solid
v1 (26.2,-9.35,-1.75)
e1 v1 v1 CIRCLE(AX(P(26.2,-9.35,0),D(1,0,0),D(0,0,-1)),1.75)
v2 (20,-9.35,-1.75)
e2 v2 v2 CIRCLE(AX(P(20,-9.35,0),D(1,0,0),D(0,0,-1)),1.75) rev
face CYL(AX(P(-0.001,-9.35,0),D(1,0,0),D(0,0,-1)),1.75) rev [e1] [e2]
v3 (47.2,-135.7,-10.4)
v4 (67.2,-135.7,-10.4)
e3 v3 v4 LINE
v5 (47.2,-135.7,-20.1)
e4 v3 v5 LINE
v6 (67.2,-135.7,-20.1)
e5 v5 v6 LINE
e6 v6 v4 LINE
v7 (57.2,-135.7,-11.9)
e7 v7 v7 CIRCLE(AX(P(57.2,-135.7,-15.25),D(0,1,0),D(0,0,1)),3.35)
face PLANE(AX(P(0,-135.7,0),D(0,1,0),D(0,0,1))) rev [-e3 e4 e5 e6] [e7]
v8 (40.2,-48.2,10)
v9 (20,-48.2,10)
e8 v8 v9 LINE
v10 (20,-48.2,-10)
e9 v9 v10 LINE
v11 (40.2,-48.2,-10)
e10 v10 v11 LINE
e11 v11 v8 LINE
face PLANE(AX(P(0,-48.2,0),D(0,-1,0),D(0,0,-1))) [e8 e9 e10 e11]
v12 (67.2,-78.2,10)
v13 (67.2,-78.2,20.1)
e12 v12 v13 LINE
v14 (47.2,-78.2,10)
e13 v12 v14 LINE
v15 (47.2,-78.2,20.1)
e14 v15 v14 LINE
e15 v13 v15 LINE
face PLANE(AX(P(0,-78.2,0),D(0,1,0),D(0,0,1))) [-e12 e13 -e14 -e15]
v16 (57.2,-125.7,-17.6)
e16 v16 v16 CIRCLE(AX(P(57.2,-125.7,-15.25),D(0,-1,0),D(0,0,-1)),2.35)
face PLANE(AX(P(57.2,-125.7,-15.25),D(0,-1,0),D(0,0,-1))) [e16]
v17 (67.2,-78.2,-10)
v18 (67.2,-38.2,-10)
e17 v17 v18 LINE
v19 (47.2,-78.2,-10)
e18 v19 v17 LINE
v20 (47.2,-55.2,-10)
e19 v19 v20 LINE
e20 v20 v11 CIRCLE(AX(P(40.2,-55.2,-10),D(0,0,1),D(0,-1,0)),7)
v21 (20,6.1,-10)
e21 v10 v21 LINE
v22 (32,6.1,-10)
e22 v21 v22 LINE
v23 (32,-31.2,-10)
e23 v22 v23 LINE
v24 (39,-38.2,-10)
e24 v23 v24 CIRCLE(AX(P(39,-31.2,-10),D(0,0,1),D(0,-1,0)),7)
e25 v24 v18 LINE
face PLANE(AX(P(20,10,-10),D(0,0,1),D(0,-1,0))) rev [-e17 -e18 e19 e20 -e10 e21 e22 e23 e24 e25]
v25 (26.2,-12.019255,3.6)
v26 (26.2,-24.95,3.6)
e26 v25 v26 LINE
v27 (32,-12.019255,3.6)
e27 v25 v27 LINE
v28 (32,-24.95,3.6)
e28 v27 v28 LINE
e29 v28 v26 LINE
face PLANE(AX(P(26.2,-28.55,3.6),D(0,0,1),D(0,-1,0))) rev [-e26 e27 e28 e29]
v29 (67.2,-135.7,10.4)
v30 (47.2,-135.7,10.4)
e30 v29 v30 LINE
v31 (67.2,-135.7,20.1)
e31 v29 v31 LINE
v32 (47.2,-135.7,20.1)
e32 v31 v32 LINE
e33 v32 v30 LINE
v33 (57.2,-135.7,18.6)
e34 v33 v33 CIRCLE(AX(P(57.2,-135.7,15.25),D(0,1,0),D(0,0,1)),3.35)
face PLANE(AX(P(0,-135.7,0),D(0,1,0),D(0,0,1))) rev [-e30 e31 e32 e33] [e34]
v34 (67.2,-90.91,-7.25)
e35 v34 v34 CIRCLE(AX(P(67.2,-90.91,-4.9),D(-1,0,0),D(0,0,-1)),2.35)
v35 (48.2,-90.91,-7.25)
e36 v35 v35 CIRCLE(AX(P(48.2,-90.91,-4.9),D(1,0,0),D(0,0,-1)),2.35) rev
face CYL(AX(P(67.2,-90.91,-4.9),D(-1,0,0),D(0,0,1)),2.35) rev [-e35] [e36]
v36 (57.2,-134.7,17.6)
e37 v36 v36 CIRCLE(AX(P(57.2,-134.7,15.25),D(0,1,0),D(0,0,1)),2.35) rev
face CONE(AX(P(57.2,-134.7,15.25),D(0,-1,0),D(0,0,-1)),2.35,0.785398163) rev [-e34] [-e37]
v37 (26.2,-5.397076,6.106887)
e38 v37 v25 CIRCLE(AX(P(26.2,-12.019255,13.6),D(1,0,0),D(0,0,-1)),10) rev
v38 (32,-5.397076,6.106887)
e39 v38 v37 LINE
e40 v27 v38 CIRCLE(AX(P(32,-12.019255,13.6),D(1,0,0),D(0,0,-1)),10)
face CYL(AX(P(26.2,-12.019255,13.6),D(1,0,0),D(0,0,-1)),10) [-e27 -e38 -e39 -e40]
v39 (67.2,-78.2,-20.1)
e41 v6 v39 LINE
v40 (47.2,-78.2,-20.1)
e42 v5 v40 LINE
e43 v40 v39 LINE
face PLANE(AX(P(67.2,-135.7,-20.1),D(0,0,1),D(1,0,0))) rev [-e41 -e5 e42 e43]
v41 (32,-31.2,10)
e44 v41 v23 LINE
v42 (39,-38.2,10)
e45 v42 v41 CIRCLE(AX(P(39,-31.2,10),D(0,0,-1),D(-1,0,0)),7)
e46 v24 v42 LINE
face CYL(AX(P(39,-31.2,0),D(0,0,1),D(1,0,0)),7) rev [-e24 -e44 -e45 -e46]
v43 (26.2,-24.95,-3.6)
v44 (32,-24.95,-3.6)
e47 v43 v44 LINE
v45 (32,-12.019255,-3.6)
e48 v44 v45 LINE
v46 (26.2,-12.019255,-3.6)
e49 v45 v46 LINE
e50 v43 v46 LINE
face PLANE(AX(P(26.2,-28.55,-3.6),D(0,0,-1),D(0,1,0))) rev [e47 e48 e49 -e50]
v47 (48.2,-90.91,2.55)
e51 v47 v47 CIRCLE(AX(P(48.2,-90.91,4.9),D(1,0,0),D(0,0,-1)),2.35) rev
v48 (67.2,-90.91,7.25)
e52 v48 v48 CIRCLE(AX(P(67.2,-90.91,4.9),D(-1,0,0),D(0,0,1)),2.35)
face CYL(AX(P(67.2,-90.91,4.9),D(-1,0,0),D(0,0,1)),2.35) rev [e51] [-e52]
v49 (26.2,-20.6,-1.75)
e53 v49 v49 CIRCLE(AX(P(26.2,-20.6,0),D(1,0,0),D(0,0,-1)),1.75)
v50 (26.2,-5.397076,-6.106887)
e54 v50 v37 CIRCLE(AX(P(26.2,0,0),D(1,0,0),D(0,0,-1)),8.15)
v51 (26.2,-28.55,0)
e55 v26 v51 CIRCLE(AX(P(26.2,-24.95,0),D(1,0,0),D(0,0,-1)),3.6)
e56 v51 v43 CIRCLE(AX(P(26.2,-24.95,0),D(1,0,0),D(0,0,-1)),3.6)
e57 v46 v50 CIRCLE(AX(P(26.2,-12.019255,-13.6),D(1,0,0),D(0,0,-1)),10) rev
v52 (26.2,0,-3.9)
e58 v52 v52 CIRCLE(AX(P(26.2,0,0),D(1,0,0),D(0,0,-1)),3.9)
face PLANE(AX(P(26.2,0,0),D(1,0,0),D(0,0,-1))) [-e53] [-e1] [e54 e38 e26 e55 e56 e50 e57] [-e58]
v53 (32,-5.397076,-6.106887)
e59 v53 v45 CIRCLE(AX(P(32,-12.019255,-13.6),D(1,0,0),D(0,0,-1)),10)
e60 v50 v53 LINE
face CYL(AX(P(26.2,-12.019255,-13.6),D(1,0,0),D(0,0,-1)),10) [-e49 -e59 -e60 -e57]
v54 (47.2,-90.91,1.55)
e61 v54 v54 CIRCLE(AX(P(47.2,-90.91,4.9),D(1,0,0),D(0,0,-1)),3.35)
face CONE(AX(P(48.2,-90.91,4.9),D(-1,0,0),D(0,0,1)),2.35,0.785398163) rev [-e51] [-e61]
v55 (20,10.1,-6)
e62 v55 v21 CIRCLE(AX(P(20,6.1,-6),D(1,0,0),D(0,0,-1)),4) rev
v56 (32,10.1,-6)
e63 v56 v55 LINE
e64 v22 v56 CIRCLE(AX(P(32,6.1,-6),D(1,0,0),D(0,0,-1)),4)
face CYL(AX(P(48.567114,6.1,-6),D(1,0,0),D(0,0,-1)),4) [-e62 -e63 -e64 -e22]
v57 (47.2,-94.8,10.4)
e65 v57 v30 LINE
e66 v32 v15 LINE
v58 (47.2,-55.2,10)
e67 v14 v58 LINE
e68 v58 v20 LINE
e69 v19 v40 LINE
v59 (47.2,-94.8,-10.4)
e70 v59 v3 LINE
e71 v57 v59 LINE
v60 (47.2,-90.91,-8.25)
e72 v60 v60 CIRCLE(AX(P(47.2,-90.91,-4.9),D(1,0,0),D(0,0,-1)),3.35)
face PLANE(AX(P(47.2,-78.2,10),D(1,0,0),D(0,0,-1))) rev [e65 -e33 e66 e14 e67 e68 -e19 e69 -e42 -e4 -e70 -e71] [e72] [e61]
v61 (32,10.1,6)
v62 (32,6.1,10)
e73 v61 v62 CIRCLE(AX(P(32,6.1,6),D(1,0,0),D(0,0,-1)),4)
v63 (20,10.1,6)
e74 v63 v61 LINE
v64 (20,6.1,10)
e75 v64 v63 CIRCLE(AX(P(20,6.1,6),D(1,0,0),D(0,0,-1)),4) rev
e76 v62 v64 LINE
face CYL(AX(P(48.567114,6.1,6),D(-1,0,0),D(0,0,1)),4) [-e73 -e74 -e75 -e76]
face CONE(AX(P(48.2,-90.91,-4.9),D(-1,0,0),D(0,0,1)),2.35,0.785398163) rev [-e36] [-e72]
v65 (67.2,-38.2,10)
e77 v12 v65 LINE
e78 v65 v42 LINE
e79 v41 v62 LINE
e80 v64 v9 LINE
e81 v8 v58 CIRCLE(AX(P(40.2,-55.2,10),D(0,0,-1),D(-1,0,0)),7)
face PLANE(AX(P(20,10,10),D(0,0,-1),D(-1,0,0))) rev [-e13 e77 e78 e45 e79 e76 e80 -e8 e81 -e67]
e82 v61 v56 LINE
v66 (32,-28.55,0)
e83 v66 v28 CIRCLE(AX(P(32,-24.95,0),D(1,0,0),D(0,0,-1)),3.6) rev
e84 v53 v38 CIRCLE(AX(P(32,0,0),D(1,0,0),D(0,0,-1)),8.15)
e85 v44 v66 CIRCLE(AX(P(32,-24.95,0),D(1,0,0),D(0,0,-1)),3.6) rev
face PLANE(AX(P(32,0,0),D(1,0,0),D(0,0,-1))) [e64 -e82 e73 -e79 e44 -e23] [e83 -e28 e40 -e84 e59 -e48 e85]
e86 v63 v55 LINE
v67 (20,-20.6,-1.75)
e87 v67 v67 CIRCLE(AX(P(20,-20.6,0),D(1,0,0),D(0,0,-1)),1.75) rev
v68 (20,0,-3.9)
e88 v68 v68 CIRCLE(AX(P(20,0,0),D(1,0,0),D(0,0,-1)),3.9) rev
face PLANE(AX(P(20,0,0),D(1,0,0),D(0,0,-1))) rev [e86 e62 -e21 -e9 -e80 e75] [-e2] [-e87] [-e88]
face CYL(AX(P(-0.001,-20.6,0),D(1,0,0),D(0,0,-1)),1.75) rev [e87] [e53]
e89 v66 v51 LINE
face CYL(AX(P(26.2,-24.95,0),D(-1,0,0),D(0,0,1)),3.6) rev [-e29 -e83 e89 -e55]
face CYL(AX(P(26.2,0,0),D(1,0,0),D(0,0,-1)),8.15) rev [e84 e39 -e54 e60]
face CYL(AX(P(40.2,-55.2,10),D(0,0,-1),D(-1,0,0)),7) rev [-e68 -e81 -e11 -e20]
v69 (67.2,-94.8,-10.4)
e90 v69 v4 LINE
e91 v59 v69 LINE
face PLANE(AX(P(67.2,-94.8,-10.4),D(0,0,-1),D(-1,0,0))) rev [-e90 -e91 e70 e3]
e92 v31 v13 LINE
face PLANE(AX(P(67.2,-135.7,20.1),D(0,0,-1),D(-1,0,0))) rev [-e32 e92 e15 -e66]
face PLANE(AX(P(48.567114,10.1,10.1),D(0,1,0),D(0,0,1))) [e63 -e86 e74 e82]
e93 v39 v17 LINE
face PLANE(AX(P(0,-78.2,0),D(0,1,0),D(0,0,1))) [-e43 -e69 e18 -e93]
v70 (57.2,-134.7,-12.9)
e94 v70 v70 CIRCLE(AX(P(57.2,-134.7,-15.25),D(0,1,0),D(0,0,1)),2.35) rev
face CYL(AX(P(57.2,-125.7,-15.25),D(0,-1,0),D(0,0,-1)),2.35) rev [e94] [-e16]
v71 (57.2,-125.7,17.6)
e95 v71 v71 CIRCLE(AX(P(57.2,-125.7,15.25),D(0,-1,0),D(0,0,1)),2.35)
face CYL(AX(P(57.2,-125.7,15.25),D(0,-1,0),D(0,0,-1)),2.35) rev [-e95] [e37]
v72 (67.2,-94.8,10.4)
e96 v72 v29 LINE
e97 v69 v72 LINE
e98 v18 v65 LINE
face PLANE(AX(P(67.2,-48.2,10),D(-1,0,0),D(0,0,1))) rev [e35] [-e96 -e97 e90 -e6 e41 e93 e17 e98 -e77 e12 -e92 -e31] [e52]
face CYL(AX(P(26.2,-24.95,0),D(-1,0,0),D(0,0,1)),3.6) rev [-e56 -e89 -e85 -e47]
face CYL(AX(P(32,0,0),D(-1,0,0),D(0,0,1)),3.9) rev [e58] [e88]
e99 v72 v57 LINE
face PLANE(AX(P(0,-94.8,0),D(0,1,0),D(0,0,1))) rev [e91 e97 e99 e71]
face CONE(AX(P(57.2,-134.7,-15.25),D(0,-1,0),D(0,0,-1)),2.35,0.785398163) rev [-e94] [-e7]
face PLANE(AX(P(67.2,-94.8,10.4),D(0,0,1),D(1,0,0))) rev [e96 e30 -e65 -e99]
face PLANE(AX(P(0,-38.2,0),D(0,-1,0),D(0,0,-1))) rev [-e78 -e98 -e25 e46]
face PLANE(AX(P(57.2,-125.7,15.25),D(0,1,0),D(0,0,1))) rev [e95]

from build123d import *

# Parameters (mm, degrees)
SKETCH1_W            = 20
SKETCH1_H            = 20
BOSS_EXTRUDE1_DEPTH  = 20
SKETCH2_W            = 45
SKETCH2_H            = 70
BOSS_EXTRUDE2_DEPTH  = 12
CUT_EXTRUDE1_DEPTH   = 5.8
FILLET1_R            = 3.6
FILLET2_R            = 10
SKETCH5_R            = 3.9
CUT_EXTRUDE2_DEPTH   = 53.490475326
CUT_EXTRUDE3_REACH   = 51.17
SKETCH6_R            = 1.75
SKETCH7_W            = 12
SKETCH7_H            = 45
CUT_EXTRUDE4_DEPTH   = 4.8
SKETCH9_W            = 12
SKETCH9_H            = 45
CUT_EXTRUDE5_DEPTH   = 23.8
SKETCH10_W           = 12.5
SKETCH10_H           = 41.4
CUT_EXTRUDE6_DEPTH   = 23.8
SKETCH11_W           = 20
SKETCH11_H           = 1.2
CUT_EXTRUDE7_DEPTH   = 23.8
BOSS_EXTRUDE3_START  = 20
SKETCH12_W           = 20
SKETCH12_H           = 20
SKETCH12_R           = 3.9
BOSS_EXTRUDE3_DEPTH  = 20
SKETCH13_W           = 20.2
SKETCH13_H           = 20.2
SKETCH13_R           = 3.9
BOSS_EXTRUDE4_DEPTH  = 40
SKETCH14_W           = 12
SKETCH14_H           = 20
BOSS_EXTRUDE5_DEPTH  = 0.1
SKETCH17_R           = 4.83091966
BOSS_EXTRUDE8_DEPTH  = 39
SKETCH18_W           = 20.2
SKETCH18_H           = 20.2
CUT_EXTRUDE8_DEPTH   = 40
FILLET4_R            = 4
SKETCH20_W           = 12
SKETCH20_H           = 20
BOSS_EXTRUDE9_DEPTH  = 8
SKETCH21_W           = 47.2
SKETCH21_H           = 20
BOSS_EXTRUDE11_DEPTH = 10
SKETCH23_W           = 20
SKETCH23_H           = 20
BOSS_EXTRUDE12_DEPTH = 30
SKETCH25_W           = 20
SKETCH25_H           = 40.2
BOSS_EXTRUDE13_DEPTH = 57.5
SKETCH26_W           = 20
SKETCH26_H           = 20.8
CUT_EXTRUDE9_DEPTH   = 40.9
SKETCH27_R           = 2.35
CUT_EXTRUDE10_DEPTH  = 10
SKETCH28_R           = 2.35
CUT_EXTRUDE11_DEPTH  = 140.85113514
CHAMFER1_SIZE        = 1
FILLET5_R            = 7


with BuildPart() as part:
    # Sketch1 → Boss-Extrude1 (new body)
    with BuildSketch(Plane(origin=(0, 0, 0), x_dir=(0, 0, -1), z_dir=(1, 0, 0))):
        Rectangle(SKETCH1_W, SKETCH1_H)
    extrude(amount=BOSS_EXTRUDE1_DEPTH)

    # Sketch2 → Boss-Extrude2 (add)
    with BuildSketch(Plane(origin=(20, 0, 0), x_dir=(0, 0, -1), z_dir=(1, 0, 0))):
        Rectangle(SKETCH2_W, SKETCH2_H)
    extrude(amount=BOSS_EXTRUDE2_DEPTH)

    # Sketch4 → Cut-Extrude1 (cut)
    with BuildSketch(Plane(origin=(32, 0, 0), x_dir=(0, 0, -1), z_dir=(1, 0, 0))):
        with BuildLine():
            Line((3.6, -28.55), (-3.6, -28.55))
            Line((-3.6, -28.55), (-3.6, -7.311805523))
            ThreePointArc((-3.6, -7.311805523), (0, 8.15), (3.6, -7.311805523))
            Line((3.6, -7.311805523), (3.6, -28.55))
        make_face()
    extrude(amount=-CUT_EXTRUDE1_DEPTH, mode=Mode.SUBTRACT)

    # Fillet1
    fillet1_edges = [part.edges().sort_by_distance(p)[0] for p in [
        (29.1, -28.55, 3.6),
        (29.1, -28.55, -3.6),
    ]]
    fillet(fillet1_edges, radius=FILLET1_R - 0.0001)  # a hair under: the kernel refuses the full size

    # Fillet2
    fillet2_edges = [part.edges().sort_by_distance(p)[0] for p in [
        (29.1, -7.311805523, 3.6),
        (29.1, -7.311805523, -3.6),
    ]]
    fillet(fillet2_edges, radius=FILLET2_R)

    # Sketch5 → Cut-Extrude2 (cut, through all)
    with BuildSketch(Plane.ZY):
        Circle(SKETCH5_R)
    extrude(amount=-CUT_EXTRUDE2_DEPTH, mode=Mode.SUBTRACT)

    # Sketch6 → Cut-Extrude3 (cut, up to next)
    with BuildSketch(Plane(origin=(26.2, 0, 0), x_dir=(0, 0, -1), z_dir=(1, 0, 0)), mode=Mode.PRIVATE) as cut_extrude3_sk1:
        with Locations((0, -20.6)):
            Circle(SKETCH6_R)
    cut_extrude3_tool1 = extrude(cut_extrude3_sk1.sketch, amount=-CUT_EXTRUDE3_REACH, mode=Mode.PRIVATE) & part.part
    # Sketch6 → Cut-Extrude3 (cut, up to next)
    with BuildSketch(Plane(origin=(26.2, 0, 0), x_dir=(0, 0, -1), z_dir=(1, 0, 0)), mode=Mode.PRIVATE) as cut_extrude3_sk2:
        with Locations((0, -9.35)):
            Circle(SKETCH6_R)
    cut_extrude3_tool2 = extrude(cut_extrude3_sk2.sketch, amount=-CUT_EXTRUDE3_REACH, mode=Mode.PRIVATE) & part.part
    add(cut_extrude3_tool1.solids().sort_by_distance((26.2, -20.6, 0))[0], mode=Mode.SUBTRACT)
    add(cut_extrude3_tool2.solids().sort_by_distance((26.2, -9.35, 0))[0], mode=Mode.SUBTRACT)

    # Sketch7 → Cut-Extrude4 (cut)
    with BuildSketch(Plane.XZ.offset(35)):
        with Locations((26, 0)):
            Rectangle(SKETCH7_W, SKETCH7_H)
    extrude(amount=-CUT_EXTRUDE4_DEPTH, mode=Mode.SUBTRACT)

    # Sketch9 → Cut-Extrude5 (cut)
    with BuildSketch(Plane(origin=(0, 35, 0), x_dir=(1, 0, 0), z_dir=(0, 1, 0))):
        with Locations((26, 0)):
            Rectangle(SKETCH9_W, SKETCH9_H)
    extrude(amount=-CUT_EXTRUDE5_DEPTH, mode=Mode.SUBTRACT)

    # Sketch10 → Cut-Extrude6 (cut)
    with BuildSketch(Plane.ZY.offset(-20)):
        with Locations((-16.25, -9.5)):
            Rectangle(SKETCH10_W, SKETCH10_H)
        with Locations((16.25, -9.5)):
            Rectangle(SKETCH10_W, SKETCH10_H)
    extrude(amount=-CUT_EXTRUDE6_DEPTH, mode=Mode.SUBTRACT)

    # Sketch11 → Cut-Extrude7 (cut)
    with BuildSketch(Plane.ZY.offset(-20)):
        with Locations((0, 10.6)):
            Rectangle(SKETCH11_W, SKETCH11_H)
    extrude(amount=-CUT_EXTRUDE7_DEPTH, mode=Mode.SUBTRACT)

    # Sketch12 → Boss-Extrude3 (add)
    with BuildSketch(Plane.ZY.offset(BOSS_EXTRUDE3_START)):
        Rectangle(SKETCH12_W, SKETCH12_H)
        Circle(SKETCH12_R, mode=Mode.SUBTRACT)
    extrude(amount=-BOSS_EXTRUDE3_DEPTH)

    # Sketch13 → Boss-Extrude4 (add)
    with BuildSketch(Plane.ZY.offset(20)):
        Rectangle(SKETCH13_W, SKETCH13_H)
        Circle(SKETCH13_R, mode=Mode.SUBTRACT)
    extrude(amount=-BOSS_EXTRUDE4_DEPTH)

    # Sketch14 → Boss-Extrude5 (add)
    with BuildSketch(Plane(origin=(0, 10, 0), x_dir=(1, 0, 0), z_dir=(0, 1, 0))):
        with Locations((26, 0)):
            Rectangle(SKETCH14_W, SKETCH14_H)
    extrude(amount=BOSS_EXTRUDE5_DEPTH)

    # Sketch17 → Boss-Extrude8 (add)
    with BuildSketch(Plane.ZY.offset(20)):
        Circle(SKETCH17_R)
    extrude(amount=-BOSS_EXTRUDE8_DEPTH)

    # Sketch18 → Cut-Extrude8 (cut)
    with BuildSketch(Plane.ZY.offset(20)):
        Rectangle(SKETCH18_W, SKETCH18_H)
    extrude(amount=-CUT_EXTRUDE8_DEPTH, mode=Mode.SUBTRACT)

    # Fillet4
    fillet4_edges = [part.edges().sort_by_distance(p)[0] for p in [
        (26, 10.1, -10),
        (26, 10.1, 10),
    ]]
    fillet(fillet4_edges, radius=FILLET4_R)

    # Sketch20 → Boss-Extrude9 (add)
    with BuildSketch(Plane.XZ.offset(30.2)):
        with Locations((26, 0)):
            Rectangle(SKETCH20_W, SKETCH20_H)
    extrude(amount=BOSS_EXTRUDE9_DEPTH)

    # Sketch21 → Boss-Extrude11 (add)
    with BuildSketch(Plane.XZ.offset(38.2)):
        with Locations((43.6, 0)):
            Rectangle(SKETCH21_W, SKETCH21_H)
    extrude(amount=BOSS_EXTRUDE11_DEPTH)

    # Sketch23 → Boss-Extrude12 (add)
    with BuildSketch(Plane.XZ.offset(48.2)):
        with Locations((57.2, 0)):
            Rectangle(SKETCH23_W, SKETCH23_H)
    extrude(amount=BOSS_EXTRUDE12_DEPTH)

    # Sketch25 → Boss-Extrude13 (add)
    with BuildSketch(Plane.XZ.offset(78.2)):
        with Locations((57.2, 0)):
            Rectangle(SKETCH25_W, SKETCH25_H)
    extrude(amount=BOSS_EXTRUDE13_DEPTH)

    # Sketch26 → Cut-Extrude9 (cut)
    with BuildSketch(Plane.XZ.offset(135.7)):
        with Locations((57.2, 0)):
            Rectangle(SKETCH26_W, SKETCH26_H)
    extrude(amount=-CUT_EXTRUDE9_DEPTH, mode=Mode.SUBTRACT)

    # Sketch27 → Cut-Extrude10 (cut)
    with BuildSketch(Plane(origin=(0, -135.7, 0), x_dir=(-1, 0, 0), z_dir=(0, -1, 0))):
        with Locations(Location((-57.2, 15.25, 0), (0, 0, 90))):
            Circle(SKETCH27_R)
        with Locations(Location((-57.2, -15.25, 0), (0, 0, 270))):
            Circle(SKETCH27_R)
    extrude(amount=-CUT_EXTRUDE10_DEPTH, mode=Mode.SUBTRACT)

    # Sketch28 → Cut-Extrude11 (cut, through all)
    with BuildSketch(Plane.ZY.offset(-47.2)):
        with Locations((4.9, -90.91)):
            Circle(SKETCH28_R)
        with Locations(Location((-4.9, -90.91, 0), (0, 0, 180))):
            Circle(SKETCH28_R)
    extrude(amount=-CUT_EXTRUDE11_DEPTH, mode=Mode.SUBTRACT)

    # Chamfer1
    chamfer1_edges = [part.edges().sort_by_distance(p)[0] for p in [
        (57.2, -135.7, -12.9),
        (57.2, -135.7, 12.9),
        (47.2, -90.91, 2.55),
        (47.2, -90.91, -2.55),
    ]]
    chamfer(chamfer1_edges, length=CHAMFER1_SIZE)

    # Fillet5
    fillet5_edges = [part.edges().sort_by_distance(p)[0] for p in [
        (32, -38.2, 0),
        (47.2, -48.2, 0),
    ]]
    fillet(fillet5_edges, radius=FILLET5_R)


solid = part.part
